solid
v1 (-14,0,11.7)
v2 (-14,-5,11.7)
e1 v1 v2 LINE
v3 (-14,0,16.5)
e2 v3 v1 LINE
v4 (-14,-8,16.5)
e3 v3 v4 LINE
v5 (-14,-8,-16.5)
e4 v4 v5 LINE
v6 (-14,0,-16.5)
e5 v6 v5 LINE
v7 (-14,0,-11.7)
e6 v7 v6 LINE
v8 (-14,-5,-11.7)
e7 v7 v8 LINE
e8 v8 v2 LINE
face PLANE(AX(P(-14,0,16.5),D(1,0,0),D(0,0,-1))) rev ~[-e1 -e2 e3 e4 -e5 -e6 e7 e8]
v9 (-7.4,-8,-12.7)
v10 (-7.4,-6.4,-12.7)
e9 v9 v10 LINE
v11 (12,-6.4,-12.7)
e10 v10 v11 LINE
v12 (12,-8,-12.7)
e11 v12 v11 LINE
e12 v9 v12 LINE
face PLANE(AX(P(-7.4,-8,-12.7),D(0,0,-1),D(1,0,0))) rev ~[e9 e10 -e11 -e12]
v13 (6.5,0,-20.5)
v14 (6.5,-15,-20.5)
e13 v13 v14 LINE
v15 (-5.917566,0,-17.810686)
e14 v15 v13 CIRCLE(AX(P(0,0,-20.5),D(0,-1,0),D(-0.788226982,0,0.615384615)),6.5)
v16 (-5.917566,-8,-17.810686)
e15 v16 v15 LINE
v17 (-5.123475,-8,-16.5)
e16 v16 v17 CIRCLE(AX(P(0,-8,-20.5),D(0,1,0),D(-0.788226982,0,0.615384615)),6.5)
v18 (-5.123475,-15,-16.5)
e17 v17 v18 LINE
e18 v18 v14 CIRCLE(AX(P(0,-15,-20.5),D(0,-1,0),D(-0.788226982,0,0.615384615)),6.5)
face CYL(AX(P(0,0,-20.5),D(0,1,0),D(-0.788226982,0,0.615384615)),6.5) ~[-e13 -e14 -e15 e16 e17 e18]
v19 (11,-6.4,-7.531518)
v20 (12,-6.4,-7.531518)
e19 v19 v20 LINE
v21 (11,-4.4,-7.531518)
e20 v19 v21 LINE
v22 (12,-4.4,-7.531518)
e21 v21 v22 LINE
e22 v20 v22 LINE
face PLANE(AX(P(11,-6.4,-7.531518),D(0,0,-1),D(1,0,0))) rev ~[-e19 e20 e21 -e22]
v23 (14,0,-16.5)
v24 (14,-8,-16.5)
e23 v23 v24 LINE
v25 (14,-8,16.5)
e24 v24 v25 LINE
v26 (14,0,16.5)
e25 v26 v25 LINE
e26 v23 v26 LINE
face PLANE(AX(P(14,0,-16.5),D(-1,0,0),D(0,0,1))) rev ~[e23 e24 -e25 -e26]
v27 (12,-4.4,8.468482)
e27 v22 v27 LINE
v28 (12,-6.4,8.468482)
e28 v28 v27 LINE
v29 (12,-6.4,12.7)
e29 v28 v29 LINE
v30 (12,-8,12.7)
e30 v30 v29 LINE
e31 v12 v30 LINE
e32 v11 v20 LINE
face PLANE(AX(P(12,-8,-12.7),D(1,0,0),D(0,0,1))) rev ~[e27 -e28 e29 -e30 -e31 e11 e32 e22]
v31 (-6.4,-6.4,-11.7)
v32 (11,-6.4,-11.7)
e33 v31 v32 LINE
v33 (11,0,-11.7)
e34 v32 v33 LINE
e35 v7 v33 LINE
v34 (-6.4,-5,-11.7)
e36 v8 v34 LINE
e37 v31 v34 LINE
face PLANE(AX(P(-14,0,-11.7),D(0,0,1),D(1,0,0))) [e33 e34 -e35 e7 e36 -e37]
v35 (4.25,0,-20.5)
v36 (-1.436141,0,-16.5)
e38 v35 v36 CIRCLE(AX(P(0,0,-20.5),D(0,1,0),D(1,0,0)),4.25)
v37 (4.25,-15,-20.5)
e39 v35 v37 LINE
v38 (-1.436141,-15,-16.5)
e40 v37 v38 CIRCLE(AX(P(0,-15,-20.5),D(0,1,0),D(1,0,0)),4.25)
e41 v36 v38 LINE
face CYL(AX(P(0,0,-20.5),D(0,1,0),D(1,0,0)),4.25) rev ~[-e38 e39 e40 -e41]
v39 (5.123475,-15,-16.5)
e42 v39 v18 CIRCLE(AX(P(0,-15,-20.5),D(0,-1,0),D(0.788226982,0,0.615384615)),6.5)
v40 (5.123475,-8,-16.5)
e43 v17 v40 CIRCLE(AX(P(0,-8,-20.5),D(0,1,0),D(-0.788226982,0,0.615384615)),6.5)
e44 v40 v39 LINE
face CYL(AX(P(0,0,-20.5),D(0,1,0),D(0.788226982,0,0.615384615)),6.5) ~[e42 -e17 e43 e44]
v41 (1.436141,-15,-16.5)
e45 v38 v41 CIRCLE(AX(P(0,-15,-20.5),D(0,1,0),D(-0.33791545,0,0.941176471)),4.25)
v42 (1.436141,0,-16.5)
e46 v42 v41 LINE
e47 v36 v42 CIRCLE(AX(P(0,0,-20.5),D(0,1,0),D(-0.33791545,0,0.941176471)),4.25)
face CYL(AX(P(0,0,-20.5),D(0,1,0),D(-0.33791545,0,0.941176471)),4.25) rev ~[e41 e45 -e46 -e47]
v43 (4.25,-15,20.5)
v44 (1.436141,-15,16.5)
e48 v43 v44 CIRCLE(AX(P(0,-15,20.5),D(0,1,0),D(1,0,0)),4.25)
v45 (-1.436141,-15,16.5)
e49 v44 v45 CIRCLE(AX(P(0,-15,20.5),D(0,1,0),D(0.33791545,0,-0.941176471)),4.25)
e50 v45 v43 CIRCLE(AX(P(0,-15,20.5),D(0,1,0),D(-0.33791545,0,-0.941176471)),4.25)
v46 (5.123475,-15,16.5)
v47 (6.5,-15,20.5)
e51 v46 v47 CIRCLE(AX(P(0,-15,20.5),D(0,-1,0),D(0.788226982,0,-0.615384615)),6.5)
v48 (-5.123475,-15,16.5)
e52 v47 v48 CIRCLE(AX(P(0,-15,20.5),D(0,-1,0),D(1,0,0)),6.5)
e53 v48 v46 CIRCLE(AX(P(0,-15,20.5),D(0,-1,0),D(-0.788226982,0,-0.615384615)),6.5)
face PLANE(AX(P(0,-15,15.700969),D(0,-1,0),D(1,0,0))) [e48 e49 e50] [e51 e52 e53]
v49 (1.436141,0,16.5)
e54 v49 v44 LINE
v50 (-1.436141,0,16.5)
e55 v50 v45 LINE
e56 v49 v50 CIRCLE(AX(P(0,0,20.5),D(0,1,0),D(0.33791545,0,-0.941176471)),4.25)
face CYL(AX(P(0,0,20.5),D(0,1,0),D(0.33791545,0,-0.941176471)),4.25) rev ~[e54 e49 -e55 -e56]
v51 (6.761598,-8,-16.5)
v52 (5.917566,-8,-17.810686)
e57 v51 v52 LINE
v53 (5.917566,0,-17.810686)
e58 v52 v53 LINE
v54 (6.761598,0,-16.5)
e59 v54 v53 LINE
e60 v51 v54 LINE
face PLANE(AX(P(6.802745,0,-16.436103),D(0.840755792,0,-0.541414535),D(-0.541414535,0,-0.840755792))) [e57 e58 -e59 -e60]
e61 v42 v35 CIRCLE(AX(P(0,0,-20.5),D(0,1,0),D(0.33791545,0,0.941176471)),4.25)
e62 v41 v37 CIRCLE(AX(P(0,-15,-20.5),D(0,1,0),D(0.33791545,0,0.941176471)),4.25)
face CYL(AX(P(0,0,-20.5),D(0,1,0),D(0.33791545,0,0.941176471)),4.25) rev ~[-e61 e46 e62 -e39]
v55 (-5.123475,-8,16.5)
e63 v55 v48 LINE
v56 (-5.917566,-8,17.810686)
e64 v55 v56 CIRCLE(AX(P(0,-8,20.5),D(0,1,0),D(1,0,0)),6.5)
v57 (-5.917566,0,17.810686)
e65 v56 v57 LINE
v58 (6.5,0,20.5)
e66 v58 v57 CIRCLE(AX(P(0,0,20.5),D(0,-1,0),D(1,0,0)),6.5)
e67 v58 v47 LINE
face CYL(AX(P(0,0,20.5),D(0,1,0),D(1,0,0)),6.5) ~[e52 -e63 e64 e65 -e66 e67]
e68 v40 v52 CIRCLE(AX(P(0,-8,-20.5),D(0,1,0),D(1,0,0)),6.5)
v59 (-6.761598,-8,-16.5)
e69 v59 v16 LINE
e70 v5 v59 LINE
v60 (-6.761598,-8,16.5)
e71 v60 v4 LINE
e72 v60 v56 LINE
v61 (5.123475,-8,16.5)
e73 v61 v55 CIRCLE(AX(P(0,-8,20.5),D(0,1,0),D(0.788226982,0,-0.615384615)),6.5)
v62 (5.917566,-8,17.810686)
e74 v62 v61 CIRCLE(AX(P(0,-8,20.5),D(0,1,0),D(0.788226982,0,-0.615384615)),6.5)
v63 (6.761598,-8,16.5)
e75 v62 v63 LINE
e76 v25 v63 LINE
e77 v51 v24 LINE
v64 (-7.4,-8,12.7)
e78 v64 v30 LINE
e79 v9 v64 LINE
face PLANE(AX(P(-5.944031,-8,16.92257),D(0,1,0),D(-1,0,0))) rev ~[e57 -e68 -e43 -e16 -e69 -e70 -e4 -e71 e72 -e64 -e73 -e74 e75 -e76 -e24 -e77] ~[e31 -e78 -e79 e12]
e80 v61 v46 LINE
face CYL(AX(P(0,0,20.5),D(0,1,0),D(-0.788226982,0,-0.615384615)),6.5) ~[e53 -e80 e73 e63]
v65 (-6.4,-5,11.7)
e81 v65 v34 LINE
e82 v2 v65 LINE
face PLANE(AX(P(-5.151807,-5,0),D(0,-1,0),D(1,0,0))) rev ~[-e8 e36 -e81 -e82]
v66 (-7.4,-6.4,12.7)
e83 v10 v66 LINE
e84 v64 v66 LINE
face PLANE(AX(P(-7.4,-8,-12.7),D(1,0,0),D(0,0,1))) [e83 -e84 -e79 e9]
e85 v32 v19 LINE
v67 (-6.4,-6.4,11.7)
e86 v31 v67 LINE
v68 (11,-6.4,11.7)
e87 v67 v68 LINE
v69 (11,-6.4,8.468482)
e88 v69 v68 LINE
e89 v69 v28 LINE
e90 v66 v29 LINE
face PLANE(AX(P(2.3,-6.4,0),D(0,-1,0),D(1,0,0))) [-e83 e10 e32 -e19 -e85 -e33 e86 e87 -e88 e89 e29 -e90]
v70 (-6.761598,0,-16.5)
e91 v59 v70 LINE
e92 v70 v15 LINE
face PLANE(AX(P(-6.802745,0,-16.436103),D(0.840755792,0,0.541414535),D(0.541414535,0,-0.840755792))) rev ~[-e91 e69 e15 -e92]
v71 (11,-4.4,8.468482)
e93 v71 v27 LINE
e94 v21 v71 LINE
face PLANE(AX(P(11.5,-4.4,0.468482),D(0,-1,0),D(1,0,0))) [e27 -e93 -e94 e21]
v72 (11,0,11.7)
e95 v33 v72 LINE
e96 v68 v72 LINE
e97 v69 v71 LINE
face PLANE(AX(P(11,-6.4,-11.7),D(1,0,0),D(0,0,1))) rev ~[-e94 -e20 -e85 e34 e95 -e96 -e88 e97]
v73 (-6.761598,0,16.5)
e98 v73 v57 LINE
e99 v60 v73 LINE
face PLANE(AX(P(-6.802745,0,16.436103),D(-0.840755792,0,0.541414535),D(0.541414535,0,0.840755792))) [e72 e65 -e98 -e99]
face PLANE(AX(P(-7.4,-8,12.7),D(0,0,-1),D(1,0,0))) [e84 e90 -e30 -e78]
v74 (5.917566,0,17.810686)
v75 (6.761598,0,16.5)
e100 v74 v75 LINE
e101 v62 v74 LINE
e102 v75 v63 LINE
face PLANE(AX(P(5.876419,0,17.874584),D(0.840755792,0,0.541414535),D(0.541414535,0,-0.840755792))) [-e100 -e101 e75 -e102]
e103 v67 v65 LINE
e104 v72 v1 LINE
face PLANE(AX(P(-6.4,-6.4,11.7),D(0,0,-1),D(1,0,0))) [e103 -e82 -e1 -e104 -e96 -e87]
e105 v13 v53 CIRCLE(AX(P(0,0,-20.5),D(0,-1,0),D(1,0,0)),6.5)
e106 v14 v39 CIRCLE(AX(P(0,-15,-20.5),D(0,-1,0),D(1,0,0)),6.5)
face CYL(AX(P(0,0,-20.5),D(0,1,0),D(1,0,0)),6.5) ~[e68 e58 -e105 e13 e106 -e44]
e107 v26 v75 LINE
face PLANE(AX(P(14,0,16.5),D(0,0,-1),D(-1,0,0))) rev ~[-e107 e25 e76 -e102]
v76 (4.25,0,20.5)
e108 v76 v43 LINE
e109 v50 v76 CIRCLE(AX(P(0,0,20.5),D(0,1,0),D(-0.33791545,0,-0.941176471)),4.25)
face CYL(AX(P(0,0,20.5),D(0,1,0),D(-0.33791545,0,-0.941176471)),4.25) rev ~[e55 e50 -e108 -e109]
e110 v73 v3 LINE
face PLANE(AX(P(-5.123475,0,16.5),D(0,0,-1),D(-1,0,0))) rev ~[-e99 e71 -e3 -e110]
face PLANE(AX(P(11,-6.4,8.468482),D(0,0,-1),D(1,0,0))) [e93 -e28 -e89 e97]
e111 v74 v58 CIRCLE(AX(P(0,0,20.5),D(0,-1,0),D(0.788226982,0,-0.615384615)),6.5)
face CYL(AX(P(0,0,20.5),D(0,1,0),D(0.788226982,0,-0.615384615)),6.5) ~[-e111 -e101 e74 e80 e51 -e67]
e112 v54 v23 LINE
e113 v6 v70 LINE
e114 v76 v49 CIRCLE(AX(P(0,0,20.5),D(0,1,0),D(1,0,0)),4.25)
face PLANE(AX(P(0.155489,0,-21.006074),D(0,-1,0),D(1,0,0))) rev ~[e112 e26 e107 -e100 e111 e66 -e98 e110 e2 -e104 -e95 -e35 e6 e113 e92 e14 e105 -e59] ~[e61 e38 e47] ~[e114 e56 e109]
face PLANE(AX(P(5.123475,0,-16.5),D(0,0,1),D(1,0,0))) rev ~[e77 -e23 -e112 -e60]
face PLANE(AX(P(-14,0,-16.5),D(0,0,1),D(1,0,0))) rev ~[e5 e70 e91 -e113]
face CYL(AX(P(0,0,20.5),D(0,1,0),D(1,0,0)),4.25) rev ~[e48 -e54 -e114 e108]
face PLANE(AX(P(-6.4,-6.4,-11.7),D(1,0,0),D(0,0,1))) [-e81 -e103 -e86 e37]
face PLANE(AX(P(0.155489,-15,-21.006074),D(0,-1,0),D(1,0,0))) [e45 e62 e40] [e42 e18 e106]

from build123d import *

# Parameters (mm, degrees)
F1_DEPTH    = 8
F3_DEPTH    = 15
F4_T1_DEPTH = 8
F5_W        = 19.4
F5_H        = 25.4
F6_DEPTH    = 1.6
F7_W        = 17.4
F7_H        = 23.4
F8_DEPTH    = 25
F9_W        = 17.6963857411
F9_H        = 23.4
F10_DEPTH   = 5
F11_W       = 1
F11_H       = 16
F12_DEPTH   = 2


# Not quite as in the source:
# - a fillet or chamfer that OpenCascade refuses, or shapes differently, is made with other operations: its cross-section is extruded or revolved along the edge and cut away or added
# - a feature of the source that left no trace in its solid (it failed there, or was rolled back) is left out


with BuildPart() as f1:
    # F0 (on Front) → F1 (new body)
    with BuildSketch(Plane.XZ):
        with BuildLine():
            Line((5.123475383, -16.5), (14, -16.5))
            Line((14, -16.5), (14, 16.5))
            Line((14, 16.5), (5.123475383, 16.5))
            ThreePointArc((5.123475383, 16.5), (0, 14), (-5.123475383, 16.5))
            Line((-5.123475383, 16.5), (-14, 16.5))
            Line((-14, 16.5), (-14, -16.5))
            Line((-14, -16.5), (-5.123475383, -16.5))
            ThreePointArc((-5.123475383, -16.5), (0, -14), (5.123475383, -16.5))
        make_face()
    extrude(amount=F1_DEPTH)

    # F0 (on Front) → F3 (join)
    with BuildSketch(Plane.XZ):
        with BuildLine():
            ThreePointArc((6.5, -20.5), (6.1462423475, -18.3848865266), (5.123475383, -16.5))
            Line((5.123475383, -16.5), (1.4361406616, -16.5))
            ThreePointArc((1.4361406616, -16.5), (3.4760680238, -18.0547083826), (4.25, -20.5))
            ThreePointArc((4.25, -20.5), (-2.4452916174, -23.9760680238), (-1.4361406616, -16.5))
            Line((-1.4361406616, -16.5), (-5.123475383, -16.5))
            ThreePointArc((-5.123475383, -16.5), (-2.1151134734, -26.6462423475), (6.5, -20.5))
        make_face()
        with BuildLine():
            Line((1.4361406616, -16.5), (5.123475383, -16.5))
            ThreePointArc((5.123475383, -16.5), (0, -14), (-5.123475383, -16.5))
            Line((-5.123475383, -16.5), (-1.4361406616, -16.5))
            ThreePointArc((-1.4361406616, -16.5), (0, -16.25), (1.4361406616, -16.5))
        make_face()
        with BuildLine():
            ThreePointArc((-5.123475383, 16.5), (0, 14), (5.123475383, 16.5))
            Line((5.123475383, 16.5), (1.4361406616, 16.5))
            ThreePointArc((1.4361406616, 16.5), (0, 16.25), (-1.4361406616, 16.5))
            Line((-1.4361406616, 16.5), (-5.123475383, 16.5))
        make_face()
        with BuildLine():
            Line((1.4361406616, 16.5), (5.123475383, 16.5))
            ThreePointArc((5.123475383, 16.5), (6.1462423475, 18.3848865266), (6.5, 20.5))
            ThreePointArc((6.5, 20.5), (-2.1151134734, 26.6462423475), (-5.123475383, 16.5))
            Line((-5.123475383, 16.5), (-1.4361406616, 16.5))
            ThreePointArc((-1.4361406616, 16.5), (-2.4452916174, 23.9760680238), (4.25, 20.5))
            ThreePointArc((4.25, 20.5), (3.4760680238, 18.0547083826), (1.4361406616, 16.5))
        make_face()
    extrude(amount=F3_DEPTH)

    # F4: chamfer of 1.9 on 4 edges, made by hand

    # F4_s2 → F4_t1 (join)
    with BuildSketch(Plane.XZ):
        with BuildLine():
            Line((-6.8027454264, 16.4361025598), (-5.876418772, 17.87458352))
            Line((-5.876418772, 17.87458352), (-5.8418237692, 17.8903056629))
            ThreePointArc((-5.8418237692, 17.8903056629), (-5.5354543935, 17.1659051218), (-5.0935227577, 16.5233846154))
            Line((-5.0935227577, 16.5233846154), (-5.123475383, 16.462))
            ThreePointArc((-5.123475383, 16.462), (-5.9631104047, 16.462), (-6.8027454264, 16.3981025598))
            Line((-6.8027454264, 16.3981025598), (-6.8027454264, 16.4361025598))
        make_face()
        with BuildLine():
            Line((5.876418772, 17.87458352), (6.8027454264, 16.4361025598))
            Line((6.8027454264, 16.4361025598), (6.8027454264, 16.3981025598))
            ThreePointArc((6.8027454264, 16.3981025598), (5.9631104047, 16.462), (5.123475383, 16.462))
            Line((5.123475383, 16.462), (5.0935227577, 16.5233846154))
            ThreePointArc((5.0935227577, 16.5233846154), (5.5354543935, 17.1659051218), (5.8418237692, 17.8903056629))
            Line((5.8418237692, 17.8903056629), (5.876418772, 17.87458352))
        make_face()
        with BuildLine():
            Line((6.8027454264, -16.4361025598), (5.876418772, -17.87458352))
            Line((5.876418772, -17.87458352), (5.8418237692, -17.8903056629))
            ThreePointArc((5.8418237692, -17.8903056629), (5.5354543935, -17.1659051218), (5.0935227577, -16.5233846154))
            Line((5.0935227577, -16.5233846154), (5.123475383, -16.462))
            ThreePointArc((5.123475383, -16.462), (5.9631104047, -16.462), (6.8027454264, -16.3981025598))
            Line((6.8027454264, -16.3981025598), (6.8027454264, -16.4361025598))
        make_face()
        with BuildLine():
            Line((-6.8027454264, -16.4361025598), (-5.876418772, -17.87458352))
            Line((-5.876418772, -17.87458352), (-5.8418237692, -17.8903056629))
            ThreePointArc((-5.8418237692, -17.8903056629), (-5.5354543935, -17.1659051218), (-5.0935227577, -16.5233846154))
            Line((-5.0935227577, -16.5233846154), (-5.123475383, -16.462))
            ThreePointArc((-5.123475383, -16.462), (-5.9631104047, -16.462), (-6.8027454264, -16.3981025598))
            Line((-6.8027454264, -16.3981025598), (-6.8027454264, -16.4361025598))
        make_face()
    extrude(amount=F4_T1_DEPTH)

    # F5 (on face) → F6 (cut)
    with BuildSketch(Plane.XZ.offset(8)):
        with Locations((2.3, 0)):
            Rectangle(F5_W, F5_H)
    extrude(amount=-F6_DEPTH, mode=Mode.SUBTRACT)

    # F7 (on face) → F8 (cut)
    with BuildSketch(Plane.XZ.offset(6.4)):
        with Locations((2.3, 0)):
            Rectangle(F7_W, F7_H)
    extrude(amount=-F8_DEPTH, mode=Mode.SUBTRACT)

    # F9 (on face) → F10 (cut)
    with BuildSketch(Plane.XZ):
        with Locations((-5.1518071295, 0)):
            Rectangle(F9_W, F9_H)
    extrude(amount=F10_DEPTH, mode=Mode.SUBTRACT)

    # F11 (on face) → F12 (cut)
    with BuildSketch(Plane.XZ.offset(6.4)):
        with Locations((11.5, 0.4684822634)):
            Rectangle(F11_W, F11_H)
    extrude(amount=-F12_DEPTH, mode=Mode.SUBTRACT)


solid = f1.part
